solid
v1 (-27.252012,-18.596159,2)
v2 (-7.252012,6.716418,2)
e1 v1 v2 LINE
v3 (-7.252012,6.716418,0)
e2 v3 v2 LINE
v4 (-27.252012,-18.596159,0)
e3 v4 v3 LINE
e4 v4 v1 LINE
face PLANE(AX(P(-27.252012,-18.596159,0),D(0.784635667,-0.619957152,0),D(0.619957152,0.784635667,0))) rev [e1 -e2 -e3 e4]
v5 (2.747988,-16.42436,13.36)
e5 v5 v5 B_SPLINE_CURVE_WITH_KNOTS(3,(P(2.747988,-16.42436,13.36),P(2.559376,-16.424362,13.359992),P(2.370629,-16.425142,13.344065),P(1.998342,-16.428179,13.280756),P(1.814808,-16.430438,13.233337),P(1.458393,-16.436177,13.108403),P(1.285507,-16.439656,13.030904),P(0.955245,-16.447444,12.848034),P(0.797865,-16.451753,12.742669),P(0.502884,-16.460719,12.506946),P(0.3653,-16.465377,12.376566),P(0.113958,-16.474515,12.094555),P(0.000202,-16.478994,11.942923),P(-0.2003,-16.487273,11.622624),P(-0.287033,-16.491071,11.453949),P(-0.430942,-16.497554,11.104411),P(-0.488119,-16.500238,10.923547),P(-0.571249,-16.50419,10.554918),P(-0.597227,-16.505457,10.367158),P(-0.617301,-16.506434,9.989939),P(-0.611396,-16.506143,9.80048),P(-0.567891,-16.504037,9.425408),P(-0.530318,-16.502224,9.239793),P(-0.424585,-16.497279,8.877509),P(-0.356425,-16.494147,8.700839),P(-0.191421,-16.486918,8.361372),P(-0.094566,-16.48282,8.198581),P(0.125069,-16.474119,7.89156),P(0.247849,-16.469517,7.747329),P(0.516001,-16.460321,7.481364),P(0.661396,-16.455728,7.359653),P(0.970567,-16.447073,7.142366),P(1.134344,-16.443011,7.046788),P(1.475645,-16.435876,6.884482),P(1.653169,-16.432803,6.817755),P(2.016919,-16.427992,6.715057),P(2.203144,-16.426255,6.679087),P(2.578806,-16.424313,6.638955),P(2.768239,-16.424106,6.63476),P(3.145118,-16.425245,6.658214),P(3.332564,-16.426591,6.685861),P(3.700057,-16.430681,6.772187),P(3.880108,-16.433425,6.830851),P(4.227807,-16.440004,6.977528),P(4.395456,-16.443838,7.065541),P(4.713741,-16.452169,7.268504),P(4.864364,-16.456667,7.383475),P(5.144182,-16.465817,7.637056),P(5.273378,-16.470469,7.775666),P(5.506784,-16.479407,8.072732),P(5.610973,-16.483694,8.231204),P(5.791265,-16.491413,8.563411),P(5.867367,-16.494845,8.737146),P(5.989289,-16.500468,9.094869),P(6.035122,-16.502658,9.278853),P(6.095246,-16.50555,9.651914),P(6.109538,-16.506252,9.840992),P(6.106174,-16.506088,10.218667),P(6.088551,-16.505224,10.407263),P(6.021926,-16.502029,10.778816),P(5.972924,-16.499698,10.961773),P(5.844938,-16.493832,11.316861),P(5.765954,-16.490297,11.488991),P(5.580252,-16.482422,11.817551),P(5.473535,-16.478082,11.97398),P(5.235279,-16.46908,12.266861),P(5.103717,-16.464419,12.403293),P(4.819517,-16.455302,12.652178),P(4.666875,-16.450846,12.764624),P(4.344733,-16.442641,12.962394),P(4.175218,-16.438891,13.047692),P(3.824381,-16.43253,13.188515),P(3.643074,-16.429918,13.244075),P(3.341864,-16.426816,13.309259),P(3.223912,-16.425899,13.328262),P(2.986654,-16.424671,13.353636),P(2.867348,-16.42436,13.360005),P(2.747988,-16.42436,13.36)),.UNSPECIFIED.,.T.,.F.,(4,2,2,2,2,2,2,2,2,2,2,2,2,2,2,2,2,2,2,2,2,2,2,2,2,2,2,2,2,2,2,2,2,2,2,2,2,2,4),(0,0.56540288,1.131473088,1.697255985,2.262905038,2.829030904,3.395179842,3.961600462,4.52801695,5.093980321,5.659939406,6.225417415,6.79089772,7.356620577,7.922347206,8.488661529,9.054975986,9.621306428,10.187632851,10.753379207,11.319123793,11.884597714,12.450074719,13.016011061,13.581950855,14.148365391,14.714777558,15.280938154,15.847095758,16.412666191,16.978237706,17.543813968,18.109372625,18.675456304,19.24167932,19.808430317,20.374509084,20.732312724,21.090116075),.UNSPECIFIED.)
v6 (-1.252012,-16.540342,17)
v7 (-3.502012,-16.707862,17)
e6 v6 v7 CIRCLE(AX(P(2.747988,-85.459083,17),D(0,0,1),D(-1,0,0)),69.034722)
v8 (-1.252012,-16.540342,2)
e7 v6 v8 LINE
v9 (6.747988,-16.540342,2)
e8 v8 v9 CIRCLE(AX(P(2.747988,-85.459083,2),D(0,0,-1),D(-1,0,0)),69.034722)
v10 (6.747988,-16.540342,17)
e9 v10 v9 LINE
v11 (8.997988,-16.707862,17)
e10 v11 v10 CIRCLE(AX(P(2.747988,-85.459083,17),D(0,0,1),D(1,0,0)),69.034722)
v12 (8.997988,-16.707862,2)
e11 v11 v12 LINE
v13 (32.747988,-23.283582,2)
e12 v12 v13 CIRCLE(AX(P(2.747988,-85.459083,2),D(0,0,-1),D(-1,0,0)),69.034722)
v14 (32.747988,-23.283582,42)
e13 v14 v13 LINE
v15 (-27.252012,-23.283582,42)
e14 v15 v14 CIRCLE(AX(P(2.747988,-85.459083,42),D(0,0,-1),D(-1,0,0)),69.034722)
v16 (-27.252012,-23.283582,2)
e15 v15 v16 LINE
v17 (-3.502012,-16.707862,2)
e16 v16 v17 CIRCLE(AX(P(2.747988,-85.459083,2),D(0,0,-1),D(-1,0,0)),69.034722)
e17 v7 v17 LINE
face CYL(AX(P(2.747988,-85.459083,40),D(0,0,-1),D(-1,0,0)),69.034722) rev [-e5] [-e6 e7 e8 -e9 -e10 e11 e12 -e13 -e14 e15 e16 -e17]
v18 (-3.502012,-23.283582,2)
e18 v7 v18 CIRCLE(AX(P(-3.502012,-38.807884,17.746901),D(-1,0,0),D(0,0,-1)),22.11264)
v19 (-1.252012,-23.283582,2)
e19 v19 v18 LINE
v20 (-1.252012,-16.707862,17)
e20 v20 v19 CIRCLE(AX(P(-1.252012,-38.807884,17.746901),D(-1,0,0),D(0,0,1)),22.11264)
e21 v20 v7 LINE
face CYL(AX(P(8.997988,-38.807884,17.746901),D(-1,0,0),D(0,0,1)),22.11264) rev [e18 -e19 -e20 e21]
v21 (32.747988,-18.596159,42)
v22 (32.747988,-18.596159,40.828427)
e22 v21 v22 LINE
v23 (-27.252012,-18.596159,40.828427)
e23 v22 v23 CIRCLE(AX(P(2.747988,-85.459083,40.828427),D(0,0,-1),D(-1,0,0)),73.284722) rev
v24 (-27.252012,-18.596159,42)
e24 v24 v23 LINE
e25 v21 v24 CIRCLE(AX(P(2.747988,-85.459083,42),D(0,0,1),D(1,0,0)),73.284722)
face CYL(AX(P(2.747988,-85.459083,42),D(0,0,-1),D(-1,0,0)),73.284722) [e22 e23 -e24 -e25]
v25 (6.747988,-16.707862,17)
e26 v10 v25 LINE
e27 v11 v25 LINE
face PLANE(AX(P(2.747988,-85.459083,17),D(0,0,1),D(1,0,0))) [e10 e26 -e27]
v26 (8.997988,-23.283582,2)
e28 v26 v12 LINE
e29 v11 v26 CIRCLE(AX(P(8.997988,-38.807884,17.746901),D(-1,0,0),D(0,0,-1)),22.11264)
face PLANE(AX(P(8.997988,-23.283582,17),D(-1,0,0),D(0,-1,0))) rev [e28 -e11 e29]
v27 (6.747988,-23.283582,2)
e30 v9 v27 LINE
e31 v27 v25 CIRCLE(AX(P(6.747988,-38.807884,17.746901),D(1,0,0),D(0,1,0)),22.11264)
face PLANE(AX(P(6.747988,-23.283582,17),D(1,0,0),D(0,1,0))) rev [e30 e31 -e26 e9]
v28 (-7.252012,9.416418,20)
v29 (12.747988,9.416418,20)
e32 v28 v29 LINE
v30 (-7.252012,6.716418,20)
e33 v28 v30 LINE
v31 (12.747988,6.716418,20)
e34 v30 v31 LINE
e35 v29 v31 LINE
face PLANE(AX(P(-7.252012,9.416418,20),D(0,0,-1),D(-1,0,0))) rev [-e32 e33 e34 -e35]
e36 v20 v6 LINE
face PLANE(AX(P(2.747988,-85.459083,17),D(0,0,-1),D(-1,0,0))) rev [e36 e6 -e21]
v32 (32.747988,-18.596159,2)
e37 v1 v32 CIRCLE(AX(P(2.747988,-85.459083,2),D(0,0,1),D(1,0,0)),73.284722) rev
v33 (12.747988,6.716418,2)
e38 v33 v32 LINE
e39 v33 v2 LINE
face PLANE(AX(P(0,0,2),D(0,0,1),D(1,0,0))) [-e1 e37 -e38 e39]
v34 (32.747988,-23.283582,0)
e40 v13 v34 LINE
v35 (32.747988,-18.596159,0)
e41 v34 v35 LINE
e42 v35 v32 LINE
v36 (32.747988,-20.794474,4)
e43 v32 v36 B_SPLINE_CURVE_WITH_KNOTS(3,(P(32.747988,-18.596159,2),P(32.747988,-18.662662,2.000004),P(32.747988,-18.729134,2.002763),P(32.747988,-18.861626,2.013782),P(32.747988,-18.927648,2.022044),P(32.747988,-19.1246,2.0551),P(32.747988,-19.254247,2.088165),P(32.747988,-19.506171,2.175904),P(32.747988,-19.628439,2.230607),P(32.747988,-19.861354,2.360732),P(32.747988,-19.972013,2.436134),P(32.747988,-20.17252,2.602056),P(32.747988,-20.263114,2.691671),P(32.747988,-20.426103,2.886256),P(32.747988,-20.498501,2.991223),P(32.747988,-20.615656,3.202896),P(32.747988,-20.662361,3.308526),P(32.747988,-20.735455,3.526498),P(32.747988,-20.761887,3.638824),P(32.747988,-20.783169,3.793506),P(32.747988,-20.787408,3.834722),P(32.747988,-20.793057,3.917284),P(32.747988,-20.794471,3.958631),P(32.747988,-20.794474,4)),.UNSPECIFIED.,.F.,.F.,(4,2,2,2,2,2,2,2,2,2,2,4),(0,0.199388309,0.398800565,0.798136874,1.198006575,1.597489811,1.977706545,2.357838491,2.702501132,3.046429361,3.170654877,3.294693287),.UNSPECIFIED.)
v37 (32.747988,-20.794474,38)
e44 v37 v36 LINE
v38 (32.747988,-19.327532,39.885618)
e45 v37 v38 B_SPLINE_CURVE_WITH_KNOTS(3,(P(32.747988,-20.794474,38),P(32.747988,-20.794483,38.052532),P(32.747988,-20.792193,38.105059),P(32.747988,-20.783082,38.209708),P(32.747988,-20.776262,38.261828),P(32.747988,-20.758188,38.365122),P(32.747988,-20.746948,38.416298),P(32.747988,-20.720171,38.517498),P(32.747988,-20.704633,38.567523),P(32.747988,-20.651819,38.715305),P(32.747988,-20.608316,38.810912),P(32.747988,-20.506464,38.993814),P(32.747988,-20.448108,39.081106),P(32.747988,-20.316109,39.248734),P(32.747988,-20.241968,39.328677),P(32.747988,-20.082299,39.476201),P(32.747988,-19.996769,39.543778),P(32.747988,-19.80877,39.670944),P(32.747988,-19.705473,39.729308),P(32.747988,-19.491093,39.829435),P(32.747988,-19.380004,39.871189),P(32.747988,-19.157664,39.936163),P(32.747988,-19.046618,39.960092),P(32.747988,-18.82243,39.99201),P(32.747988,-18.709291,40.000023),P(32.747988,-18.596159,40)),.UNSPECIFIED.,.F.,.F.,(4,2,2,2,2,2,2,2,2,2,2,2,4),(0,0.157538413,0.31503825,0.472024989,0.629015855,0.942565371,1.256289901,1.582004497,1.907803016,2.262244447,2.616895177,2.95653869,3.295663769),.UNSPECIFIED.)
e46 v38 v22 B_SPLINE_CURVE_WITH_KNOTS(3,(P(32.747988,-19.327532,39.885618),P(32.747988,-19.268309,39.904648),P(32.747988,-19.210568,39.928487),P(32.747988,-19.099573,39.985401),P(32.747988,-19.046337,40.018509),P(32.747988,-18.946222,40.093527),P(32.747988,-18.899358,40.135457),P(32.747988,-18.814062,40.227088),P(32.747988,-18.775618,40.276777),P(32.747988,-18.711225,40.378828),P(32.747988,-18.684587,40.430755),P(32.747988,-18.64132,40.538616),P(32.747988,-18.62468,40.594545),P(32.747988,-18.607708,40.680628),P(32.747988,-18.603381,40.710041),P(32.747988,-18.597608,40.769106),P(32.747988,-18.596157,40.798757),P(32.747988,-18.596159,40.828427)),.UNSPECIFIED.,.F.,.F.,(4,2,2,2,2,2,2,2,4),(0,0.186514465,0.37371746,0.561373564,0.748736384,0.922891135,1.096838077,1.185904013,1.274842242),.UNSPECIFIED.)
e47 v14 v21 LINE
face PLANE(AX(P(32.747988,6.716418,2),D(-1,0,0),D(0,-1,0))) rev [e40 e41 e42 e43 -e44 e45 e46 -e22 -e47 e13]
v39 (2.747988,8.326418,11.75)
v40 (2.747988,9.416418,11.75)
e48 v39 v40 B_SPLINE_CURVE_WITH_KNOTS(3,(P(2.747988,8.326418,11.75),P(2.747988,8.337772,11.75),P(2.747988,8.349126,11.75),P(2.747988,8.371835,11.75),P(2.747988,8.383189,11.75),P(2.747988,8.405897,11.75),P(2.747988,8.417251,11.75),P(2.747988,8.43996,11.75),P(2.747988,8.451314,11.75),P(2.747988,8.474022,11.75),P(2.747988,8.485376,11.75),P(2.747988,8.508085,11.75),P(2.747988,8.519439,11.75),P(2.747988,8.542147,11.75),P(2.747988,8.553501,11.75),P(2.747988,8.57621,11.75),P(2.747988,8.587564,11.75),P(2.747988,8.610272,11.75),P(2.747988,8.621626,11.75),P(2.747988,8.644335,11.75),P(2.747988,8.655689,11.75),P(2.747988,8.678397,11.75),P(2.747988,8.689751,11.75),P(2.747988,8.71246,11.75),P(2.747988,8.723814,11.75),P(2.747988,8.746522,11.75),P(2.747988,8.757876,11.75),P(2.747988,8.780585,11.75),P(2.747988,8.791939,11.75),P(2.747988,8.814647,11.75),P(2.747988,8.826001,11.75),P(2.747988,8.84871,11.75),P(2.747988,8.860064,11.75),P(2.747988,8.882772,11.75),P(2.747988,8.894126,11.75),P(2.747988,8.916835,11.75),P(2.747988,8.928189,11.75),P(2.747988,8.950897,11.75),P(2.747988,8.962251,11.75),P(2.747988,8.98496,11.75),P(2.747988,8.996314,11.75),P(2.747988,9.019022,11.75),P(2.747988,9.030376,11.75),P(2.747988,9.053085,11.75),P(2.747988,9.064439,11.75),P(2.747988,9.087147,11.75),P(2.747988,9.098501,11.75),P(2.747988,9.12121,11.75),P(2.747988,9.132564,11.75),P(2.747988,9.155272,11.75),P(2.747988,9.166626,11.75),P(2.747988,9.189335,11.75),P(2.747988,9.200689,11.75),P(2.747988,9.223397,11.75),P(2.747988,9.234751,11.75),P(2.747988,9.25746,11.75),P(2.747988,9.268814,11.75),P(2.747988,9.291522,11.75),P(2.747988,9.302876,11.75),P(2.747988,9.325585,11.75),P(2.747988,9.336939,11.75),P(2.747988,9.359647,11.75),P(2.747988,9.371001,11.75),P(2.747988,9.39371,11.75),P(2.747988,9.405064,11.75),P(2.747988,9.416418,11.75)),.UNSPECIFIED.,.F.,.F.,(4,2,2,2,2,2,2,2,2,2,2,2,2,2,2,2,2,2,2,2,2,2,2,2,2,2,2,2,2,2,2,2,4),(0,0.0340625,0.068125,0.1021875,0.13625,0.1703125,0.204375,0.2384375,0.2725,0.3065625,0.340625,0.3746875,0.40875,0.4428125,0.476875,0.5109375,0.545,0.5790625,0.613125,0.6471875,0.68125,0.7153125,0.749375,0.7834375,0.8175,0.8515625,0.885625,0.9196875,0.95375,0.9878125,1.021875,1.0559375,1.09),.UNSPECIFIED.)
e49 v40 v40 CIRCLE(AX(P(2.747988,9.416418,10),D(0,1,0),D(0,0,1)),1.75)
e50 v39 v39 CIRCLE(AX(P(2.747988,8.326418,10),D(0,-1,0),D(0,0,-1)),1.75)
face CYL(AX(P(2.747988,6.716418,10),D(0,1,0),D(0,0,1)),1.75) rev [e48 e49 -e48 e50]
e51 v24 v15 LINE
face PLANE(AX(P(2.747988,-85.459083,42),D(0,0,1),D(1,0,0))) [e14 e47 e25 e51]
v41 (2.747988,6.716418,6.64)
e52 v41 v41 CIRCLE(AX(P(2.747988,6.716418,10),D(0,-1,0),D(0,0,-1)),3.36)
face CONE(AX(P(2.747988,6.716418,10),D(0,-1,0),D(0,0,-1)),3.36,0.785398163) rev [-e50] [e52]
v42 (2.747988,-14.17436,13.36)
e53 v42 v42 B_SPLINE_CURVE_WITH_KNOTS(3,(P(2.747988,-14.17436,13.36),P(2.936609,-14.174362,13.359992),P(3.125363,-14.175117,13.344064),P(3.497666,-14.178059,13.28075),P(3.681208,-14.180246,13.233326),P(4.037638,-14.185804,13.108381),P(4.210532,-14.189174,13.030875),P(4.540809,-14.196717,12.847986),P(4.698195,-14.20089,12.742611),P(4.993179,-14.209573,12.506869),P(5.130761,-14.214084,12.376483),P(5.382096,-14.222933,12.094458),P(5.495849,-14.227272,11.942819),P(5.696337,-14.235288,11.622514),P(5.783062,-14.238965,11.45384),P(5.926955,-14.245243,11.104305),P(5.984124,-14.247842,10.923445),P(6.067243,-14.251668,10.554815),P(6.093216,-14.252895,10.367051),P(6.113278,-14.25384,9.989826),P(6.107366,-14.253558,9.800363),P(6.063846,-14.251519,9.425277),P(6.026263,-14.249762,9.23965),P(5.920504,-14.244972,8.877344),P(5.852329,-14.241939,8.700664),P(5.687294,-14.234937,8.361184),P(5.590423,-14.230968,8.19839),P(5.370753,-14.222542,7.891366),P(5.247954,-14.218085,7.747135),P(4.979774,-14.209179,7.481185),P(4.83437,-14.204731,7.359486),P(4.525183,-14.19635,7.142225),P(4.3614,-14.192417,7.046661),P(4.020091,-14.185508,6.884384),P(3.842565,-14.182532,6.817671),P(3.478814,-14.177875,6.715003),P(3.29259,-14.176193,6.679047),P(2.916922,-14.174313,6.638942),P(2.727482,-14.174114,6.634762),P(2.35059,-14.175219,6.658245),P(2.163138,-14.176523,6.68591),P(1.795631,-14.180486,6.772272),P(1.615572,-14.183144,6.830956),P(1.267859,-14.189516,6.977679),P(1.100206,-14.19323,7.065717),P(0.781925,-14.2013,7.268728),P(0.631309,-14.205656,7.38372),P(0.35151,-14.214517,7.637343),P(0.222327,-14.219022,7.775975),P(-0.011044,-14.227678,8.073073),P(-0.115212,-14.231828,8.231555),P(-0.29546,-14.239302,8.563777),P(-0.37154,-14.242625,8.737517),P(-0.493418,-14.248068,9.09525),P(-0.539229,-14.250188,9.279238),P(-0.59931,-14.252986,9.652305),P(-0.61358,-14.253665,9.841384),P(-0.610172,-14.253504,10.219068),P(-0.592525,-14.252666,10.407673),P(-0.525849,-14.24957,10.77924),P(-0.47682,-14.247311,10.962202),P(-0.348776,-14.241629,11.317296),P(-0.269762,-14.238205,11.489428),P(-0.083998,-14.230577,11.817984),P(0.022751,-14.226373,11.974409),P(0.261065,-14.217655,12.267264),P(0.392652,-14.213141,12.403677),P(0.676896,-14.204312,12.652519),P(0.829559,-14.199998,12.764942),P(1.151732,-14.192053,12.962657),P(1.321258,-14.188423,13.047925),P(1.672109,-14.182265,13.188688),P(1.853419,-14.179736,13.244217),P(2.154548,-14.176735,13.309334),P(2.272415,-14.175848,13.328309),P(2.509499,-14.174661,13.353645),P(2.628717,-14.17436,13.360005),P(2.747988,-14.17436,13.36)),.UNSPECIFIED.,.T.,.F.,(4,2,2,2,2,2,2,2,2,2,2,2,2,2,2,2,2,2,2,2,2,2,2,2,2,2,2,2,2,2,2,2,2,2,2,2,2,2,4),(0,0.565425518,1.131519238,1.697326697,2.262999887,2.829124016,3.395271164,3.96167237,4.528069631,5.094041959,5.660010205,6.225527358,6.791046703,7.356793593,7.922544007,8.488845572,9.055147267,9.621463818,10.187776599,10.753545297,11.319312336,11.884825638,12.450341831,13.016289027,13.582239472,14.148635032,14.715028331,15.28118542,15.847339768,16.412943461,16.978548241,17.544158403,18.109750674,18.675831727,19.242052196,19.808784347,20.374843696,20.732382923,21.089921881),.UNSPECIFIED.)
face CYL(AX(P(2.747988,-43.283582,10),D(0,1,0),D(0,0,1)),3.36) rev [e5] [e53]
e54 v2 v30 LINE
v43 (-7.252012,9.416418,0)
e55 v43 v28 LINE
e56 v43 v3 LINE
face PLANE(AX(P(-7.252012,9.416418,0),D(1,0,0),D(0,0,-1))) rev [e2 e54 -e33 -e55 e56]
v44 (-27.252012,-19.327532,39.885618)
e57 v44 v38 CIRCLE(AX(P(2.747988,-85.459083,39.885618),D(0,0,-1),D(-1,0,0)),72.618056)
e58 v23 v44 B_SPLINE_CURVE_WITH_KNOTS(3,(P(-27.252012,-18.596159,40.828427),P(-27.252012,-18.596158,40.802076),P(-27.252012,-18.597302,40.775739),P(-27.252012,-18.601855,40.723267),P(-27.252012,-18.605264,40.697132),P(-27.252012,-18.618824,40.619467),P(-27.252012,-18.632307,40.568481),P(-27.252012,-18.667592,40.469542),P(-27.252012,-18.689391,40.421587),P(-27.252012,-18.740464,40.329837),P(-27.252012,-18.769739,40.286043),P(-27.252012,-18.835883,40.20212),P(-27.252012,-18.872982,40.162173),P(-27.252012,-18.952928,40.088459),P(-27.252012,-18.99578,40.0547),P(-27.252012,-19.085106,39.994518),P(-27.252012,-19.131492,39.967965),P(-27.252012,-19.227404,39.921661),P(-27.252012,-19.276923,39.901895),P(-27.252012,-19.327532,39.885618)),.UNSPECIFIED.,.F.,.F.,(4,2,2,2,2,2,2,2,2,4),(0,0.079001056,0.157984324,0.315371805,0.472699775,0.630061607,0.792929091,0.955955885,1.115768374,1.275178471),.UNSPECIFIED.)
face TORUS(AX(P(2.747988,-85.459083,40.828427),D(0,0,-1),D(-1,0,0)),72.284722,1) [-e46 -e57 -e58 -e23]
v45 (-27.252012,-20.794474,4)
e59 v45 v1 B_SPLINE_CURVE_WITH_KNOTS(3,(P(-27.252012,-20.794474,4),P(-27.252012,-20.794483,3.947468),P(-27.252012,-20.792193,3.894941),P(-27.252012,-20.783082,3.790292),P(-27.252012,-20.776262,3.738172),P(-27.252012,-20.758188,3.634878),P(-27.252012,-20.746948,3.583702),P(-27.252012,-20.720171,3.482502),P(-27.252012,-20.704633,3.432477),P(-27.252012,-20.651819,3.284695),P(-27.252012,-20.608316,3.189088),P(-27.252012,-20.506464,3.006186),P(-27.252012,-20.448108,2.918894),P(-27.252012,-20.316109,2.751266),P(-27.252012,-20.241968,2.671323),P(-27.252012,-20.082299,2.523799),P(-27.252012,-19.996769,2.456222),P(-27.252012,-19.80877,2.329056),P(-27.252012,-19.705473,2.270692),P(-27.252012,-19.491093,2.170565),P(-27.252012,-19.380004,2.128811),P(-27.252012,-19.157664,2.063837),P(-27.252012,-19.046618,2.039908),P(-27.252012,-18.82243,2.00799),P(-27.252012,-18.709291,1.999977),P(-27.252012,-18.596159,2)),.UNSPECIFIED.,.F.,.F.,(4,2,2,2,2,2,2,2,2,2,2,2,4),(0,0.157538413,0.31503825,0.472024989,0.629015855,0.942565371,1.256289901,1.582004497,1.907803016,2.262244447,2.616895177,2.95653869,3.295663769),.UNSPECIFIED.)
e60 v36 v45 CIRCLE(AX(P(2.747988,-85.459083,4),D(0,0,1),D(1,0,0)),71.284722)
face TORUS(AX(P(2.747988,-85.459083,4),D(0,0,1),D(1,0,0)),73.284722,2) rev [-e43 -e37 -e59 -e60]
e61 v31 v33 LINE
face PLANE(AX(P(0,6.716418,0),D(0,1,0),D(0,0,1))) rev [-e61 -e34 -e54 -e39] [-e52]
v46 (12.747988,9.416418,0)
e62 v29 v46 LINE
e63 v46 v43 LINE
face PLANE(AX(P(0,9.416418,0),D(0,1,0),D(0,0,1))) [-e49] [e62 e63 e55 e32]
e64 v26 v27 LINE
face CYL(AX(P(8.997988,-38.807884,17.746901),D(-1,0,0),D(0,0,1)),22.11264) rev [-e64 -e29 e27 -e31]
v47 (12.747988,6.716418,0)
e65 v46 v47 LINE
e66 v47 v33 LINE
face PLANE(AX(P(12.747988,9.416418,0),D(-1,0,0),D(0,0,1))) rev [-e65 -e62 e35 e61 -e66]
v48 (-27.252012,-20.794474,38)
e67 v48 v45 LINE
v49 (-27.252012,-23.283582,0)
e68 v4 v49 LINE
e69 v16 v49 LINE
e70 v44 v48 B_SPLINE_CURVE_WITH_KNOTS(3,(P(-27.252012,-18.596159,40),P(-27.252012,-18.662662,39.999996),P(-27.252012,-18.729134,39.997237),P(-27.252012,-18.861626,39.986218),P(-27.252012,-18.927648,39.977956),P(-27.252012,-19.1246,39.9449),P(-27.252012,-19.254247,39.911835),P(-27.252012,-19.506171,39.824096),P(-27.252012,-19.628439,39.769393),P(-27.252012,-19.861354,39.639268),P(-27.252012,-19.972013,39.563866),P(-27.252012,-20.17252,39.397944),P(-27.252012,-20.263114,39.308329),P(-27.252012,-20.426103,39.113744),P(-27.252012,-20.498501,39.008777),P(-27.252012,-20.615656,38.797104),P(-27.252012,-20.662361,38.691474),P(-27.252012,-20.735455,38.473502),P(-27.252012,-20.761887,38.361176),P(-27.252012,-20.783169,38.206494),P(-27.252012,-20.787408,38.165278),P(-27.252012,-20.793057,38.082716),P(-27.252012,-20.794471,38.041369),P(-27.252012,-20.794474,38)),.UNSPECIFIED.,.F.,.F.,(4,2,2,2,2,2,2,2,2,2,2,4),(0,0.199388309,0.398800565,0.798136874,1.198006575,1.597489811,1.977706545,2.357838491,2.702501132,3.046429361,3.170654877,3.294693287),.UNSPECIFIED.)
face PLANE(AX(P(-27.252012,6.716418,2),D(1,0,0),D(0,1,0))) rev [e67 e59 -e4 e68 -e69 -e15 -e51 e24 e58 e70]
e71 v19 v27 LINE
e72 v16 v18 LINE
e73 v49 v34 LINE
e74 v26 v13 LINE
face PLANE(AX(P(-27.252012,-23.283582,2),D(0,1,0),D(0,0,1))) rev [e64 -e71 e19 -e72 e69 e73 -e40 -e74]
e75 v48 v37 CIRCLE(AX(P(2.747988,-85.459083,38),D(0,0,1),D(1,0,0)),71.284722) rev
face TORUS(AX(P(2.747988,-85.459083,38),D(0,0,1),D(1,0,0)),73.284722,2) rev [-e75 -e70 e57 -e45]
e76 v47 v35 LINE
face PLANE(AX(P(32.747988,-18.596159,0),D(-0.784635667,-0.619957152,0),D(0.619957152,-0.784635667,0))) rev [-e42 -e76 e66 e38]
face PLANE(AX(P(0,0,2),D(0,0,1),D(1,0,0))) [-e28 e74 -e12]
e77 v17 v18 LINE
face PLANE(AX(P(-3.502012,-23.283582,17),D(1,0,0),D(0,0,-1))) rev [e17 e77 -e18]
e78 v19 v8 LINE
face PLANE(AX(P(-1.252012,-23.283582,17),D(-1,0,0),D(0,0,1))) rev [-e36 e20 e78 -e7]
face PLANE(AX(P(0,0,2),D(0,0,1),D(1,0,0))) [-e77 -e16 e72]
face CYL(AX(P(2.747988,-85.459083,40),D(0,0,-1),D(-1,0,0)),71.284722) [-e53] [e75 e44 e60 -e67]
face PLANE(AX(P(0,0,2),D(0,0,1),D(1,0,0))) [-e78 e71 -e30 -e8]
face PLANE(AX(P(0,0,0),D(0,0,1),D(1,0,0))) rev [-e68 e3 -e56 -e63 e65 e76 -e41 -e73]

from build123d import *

# Parameters (mm, degrees)
CROQUIS1_W              = 60
CROQUIS1_H              = 30
SALIENTE_EXTRUIR1_DEPTH = 2
SALIENTE_EXTRUIR2_DEPTH = 38
SALIENTE_EXTRUIR4_DEPTH = 2
REDONDEO1_R             = 2
REDONDEO2_R             = 1
CORTAR_EXTRUIR2_DEPTH   = 2
CROQUIS7_W              = 20
CROQUIS7_H              = 20
SALIENTE_EXTRUIR5_DEPTH = 2.7
CROQUIS8_R              = 1.75
CORTAR_EXTRUIR3_DEPTH   = 2.7
CROQUIS11_R             = 3.36
CORTAR_EXTRUIR4_DEPTH   = 50
SALIENTE_EXTRUIR3_DEPTH = 15
CORTAR_EXTRUIR1_START   = -12.5
CORTAR_EXTRUIR1_DEPTH   = 12.5


with BuildPart() as part:
    # Croquis1 → Saliente-Extruir1 (new body)
    with BuildSketch(Plane.XY):
        with Locations((2.747988453, -8.28358209)):
            Rectangle(CROQUIS1_W, CROQUIS1_H)
    extrude(amount=SALIENTE_EXTRUIR1_DEPTH)

    # Croquis2 → Saliente-Extruir2 (add)
    with BuildSketch(Plane.XY.offset(2)):
        with BuildLine():
            Line((-27.252011547, -23.28358209), (-27.252011547, -20.794473938))
            ThreePointArc((-27.252011547, -20.794473938), (2.747988453, -14.174360447), (32.747988453, -20.794473938))
            Line((32.747988453, -20.794473938), (32.747988453, -23.28358209))
            ThreePointArc((32.747988453, -23.28358209), (2.747988453, -16.424360447), (-27.252011547, -23.28358209))
        make_face()
    extrude(amount=SALIENTE_EXTRUIR2_DEPTH)

    # Croquis5 → Saliente-Extruir4 (add)
    with BuildSketch(Plane.XY.offset(40)):
        with BuildLine():
            Line((32.747988453, -23.28358209), (32.747988453, -18.596159377))
            ThreePointArc((32.747988453, -18.596159377), (2.747988453, -12.174360447), (-27.252011547, -18.596159377))
            Line((-27.252011547, -18.596159377), (-27.252011547, -23.28358209))
            ThreePointArc((-27.252011547, -23.28358209), (2.747988453, -16.424360447), (32.747988453, -23.28358209))
        make_face()
    extrude(amount=SALIENTE_EXTRUIR4_DEPTH)

    # Redondeo1
    redondeo1_edges = [part.edges().sort_by_distance(p)[0] for p in [
        (2.747988453, -14.174360447, 2),
        (2.747988453, -14.174360447, 40),
    ]]
    fillet(redondeo1_edges, radius=REDONDEO1_R - 0.0001)  # a hair under: the kernel refuses the full size

    # Redondeo2
    redondeo2_edges = [part.edges().sort_by_distance(p)[0] for p in [
        (2.747988453, -12.174360447, 40),
    ]]
    fillet(redondeo2_edges, radius=REDONDEO2_R)

    # Croquis6 → Cortar-Extruir2 (cut)
    with BuildSketch(Plane.XY.offset(2)):
        Polygon((-27.252011547, -18.596159377), (-7.252011547, 6.71641791), (-27.252011547, 6.71641791), align=None)
        Polygon((12.747988453, 6.71641791), (32.747988453, 6.71641791), (32.747988453, -18.596159377), align=None)
    extrude(amount=-CORTAR_EXTRUIR2_DEPTH, mode=Mode.SUBTRACT)

    # Croquis7 → Saliente-Extruir5 (add)
    with BuildSketch(Plane(origin=(0, 6.71641791, 0), x_dir=(1, 0, 0), z_dir=(0, 1, 0))):
        with Locations((2.747988453, -10)):
            Rectangle(CROQUIS7_W, CROQUIS7_H)
    extrude(amount=SALIENTE_EXTRUIR5_DEPTH)

    # Croquis8 → Cortar-Extruir3 (cut)
    with BuildSketch(Plane(origin=(0, 9.41641791, 0), x_dir=(1, 0, 0), z_dir=(0, 1, 0))):
        with Locations(Location((2.747988453, -10, 0), (0, 0, 270))):
            Circle(CROQUIS8_R)
    extrude(amount=-CORTAR_EXTRUIR3_DEPTH, mode=Mode.SUBTRACT)

    # Croquis10 → Refrentado para tornillo tapón con cabeza plana de clavija de M31 (revolve, cut)
    with BuildSketch(Plane(origin=(2.747988453, 6.71641791, 10), x_dir=(0, 0, -1), z_dir=(1, 0, 0))):
        Polygon((0, 0), (0, 2.7), (1.7, 2.7), (1.7, 1.66), (3.36, 0), align=None)
    revolve(axis=Axis((2.747988453, 0.36641791, 10), (0, 1, 0)), mode=Mode.SUBTRACT)

    # Croquis11 → Cortar-Extruir4 (cut)
    with BuildSketch(Plane.XZ.offset(-6.71641791)):
        with Locations(Location((2.747988453, 10, 0), (0, 0, 90))):
            Circle(CROQUIS11_R)
    extrude(amount=CORTAR_EXTRUIR4_DEPTH, mode=Mode.SUBTRACT)

    # Croquis3 → Saliente-Extruir3 (add)
    with BuildSketch(Plane.XY.offset(2)):
        with BuildLine():
            Line((-1.252011547, -23.28358209), (-1.252011547, -16.540341587))
            ThreePointArc((-1.252011547, -16.540341587), (-2.377695965, -16.614909121), (-3.502011547, -16.70786179))
            Line((-3.502011547, -16.70786179), (-3.502011547, -23.28358209))
            Line((-3.502011547, -23.28358209), (-1.252011547, -23.28358209))
        make_face()
        with BuildLine():
            Line((8.997988453, -23.28358209), (8.997988453, -16.70786179))
            ThreePointArc((8.997988453, -16.70786179), (7.873672871, -16.614909121), (6.747988453, -16.540341587))
            Line((6.747988453, -16.540341587), (6.747988453, -23.28358209))
            Line((6.747988453, -23.28358209), (8.997988453, -23.28358209))
        make_face()
    extrude(amount=SALIENTE_EXTRUIR3_DEPTH)

    # Croquis4 → Cortar-Extruir1 (cut)
    with BuildSketch(Plane.ZY.offset(3.502011547).offset(CORTAR_EXTRUIR1_START)):
        with BuildLine():
            Line((17, -16.70786179), (17, -23.28358209))
            Line((17, -23.28358209), (2, -23.28358209))
            ThreePointArc((2, -23.28358209), (8.868759287, -18.555786805), (17, -16.70786179))
        make_face()
    extrude(amount=CORTAR_EXTRUIR1_DEPTH, mode=Mode.SUBTRACT)


solid = part.part
